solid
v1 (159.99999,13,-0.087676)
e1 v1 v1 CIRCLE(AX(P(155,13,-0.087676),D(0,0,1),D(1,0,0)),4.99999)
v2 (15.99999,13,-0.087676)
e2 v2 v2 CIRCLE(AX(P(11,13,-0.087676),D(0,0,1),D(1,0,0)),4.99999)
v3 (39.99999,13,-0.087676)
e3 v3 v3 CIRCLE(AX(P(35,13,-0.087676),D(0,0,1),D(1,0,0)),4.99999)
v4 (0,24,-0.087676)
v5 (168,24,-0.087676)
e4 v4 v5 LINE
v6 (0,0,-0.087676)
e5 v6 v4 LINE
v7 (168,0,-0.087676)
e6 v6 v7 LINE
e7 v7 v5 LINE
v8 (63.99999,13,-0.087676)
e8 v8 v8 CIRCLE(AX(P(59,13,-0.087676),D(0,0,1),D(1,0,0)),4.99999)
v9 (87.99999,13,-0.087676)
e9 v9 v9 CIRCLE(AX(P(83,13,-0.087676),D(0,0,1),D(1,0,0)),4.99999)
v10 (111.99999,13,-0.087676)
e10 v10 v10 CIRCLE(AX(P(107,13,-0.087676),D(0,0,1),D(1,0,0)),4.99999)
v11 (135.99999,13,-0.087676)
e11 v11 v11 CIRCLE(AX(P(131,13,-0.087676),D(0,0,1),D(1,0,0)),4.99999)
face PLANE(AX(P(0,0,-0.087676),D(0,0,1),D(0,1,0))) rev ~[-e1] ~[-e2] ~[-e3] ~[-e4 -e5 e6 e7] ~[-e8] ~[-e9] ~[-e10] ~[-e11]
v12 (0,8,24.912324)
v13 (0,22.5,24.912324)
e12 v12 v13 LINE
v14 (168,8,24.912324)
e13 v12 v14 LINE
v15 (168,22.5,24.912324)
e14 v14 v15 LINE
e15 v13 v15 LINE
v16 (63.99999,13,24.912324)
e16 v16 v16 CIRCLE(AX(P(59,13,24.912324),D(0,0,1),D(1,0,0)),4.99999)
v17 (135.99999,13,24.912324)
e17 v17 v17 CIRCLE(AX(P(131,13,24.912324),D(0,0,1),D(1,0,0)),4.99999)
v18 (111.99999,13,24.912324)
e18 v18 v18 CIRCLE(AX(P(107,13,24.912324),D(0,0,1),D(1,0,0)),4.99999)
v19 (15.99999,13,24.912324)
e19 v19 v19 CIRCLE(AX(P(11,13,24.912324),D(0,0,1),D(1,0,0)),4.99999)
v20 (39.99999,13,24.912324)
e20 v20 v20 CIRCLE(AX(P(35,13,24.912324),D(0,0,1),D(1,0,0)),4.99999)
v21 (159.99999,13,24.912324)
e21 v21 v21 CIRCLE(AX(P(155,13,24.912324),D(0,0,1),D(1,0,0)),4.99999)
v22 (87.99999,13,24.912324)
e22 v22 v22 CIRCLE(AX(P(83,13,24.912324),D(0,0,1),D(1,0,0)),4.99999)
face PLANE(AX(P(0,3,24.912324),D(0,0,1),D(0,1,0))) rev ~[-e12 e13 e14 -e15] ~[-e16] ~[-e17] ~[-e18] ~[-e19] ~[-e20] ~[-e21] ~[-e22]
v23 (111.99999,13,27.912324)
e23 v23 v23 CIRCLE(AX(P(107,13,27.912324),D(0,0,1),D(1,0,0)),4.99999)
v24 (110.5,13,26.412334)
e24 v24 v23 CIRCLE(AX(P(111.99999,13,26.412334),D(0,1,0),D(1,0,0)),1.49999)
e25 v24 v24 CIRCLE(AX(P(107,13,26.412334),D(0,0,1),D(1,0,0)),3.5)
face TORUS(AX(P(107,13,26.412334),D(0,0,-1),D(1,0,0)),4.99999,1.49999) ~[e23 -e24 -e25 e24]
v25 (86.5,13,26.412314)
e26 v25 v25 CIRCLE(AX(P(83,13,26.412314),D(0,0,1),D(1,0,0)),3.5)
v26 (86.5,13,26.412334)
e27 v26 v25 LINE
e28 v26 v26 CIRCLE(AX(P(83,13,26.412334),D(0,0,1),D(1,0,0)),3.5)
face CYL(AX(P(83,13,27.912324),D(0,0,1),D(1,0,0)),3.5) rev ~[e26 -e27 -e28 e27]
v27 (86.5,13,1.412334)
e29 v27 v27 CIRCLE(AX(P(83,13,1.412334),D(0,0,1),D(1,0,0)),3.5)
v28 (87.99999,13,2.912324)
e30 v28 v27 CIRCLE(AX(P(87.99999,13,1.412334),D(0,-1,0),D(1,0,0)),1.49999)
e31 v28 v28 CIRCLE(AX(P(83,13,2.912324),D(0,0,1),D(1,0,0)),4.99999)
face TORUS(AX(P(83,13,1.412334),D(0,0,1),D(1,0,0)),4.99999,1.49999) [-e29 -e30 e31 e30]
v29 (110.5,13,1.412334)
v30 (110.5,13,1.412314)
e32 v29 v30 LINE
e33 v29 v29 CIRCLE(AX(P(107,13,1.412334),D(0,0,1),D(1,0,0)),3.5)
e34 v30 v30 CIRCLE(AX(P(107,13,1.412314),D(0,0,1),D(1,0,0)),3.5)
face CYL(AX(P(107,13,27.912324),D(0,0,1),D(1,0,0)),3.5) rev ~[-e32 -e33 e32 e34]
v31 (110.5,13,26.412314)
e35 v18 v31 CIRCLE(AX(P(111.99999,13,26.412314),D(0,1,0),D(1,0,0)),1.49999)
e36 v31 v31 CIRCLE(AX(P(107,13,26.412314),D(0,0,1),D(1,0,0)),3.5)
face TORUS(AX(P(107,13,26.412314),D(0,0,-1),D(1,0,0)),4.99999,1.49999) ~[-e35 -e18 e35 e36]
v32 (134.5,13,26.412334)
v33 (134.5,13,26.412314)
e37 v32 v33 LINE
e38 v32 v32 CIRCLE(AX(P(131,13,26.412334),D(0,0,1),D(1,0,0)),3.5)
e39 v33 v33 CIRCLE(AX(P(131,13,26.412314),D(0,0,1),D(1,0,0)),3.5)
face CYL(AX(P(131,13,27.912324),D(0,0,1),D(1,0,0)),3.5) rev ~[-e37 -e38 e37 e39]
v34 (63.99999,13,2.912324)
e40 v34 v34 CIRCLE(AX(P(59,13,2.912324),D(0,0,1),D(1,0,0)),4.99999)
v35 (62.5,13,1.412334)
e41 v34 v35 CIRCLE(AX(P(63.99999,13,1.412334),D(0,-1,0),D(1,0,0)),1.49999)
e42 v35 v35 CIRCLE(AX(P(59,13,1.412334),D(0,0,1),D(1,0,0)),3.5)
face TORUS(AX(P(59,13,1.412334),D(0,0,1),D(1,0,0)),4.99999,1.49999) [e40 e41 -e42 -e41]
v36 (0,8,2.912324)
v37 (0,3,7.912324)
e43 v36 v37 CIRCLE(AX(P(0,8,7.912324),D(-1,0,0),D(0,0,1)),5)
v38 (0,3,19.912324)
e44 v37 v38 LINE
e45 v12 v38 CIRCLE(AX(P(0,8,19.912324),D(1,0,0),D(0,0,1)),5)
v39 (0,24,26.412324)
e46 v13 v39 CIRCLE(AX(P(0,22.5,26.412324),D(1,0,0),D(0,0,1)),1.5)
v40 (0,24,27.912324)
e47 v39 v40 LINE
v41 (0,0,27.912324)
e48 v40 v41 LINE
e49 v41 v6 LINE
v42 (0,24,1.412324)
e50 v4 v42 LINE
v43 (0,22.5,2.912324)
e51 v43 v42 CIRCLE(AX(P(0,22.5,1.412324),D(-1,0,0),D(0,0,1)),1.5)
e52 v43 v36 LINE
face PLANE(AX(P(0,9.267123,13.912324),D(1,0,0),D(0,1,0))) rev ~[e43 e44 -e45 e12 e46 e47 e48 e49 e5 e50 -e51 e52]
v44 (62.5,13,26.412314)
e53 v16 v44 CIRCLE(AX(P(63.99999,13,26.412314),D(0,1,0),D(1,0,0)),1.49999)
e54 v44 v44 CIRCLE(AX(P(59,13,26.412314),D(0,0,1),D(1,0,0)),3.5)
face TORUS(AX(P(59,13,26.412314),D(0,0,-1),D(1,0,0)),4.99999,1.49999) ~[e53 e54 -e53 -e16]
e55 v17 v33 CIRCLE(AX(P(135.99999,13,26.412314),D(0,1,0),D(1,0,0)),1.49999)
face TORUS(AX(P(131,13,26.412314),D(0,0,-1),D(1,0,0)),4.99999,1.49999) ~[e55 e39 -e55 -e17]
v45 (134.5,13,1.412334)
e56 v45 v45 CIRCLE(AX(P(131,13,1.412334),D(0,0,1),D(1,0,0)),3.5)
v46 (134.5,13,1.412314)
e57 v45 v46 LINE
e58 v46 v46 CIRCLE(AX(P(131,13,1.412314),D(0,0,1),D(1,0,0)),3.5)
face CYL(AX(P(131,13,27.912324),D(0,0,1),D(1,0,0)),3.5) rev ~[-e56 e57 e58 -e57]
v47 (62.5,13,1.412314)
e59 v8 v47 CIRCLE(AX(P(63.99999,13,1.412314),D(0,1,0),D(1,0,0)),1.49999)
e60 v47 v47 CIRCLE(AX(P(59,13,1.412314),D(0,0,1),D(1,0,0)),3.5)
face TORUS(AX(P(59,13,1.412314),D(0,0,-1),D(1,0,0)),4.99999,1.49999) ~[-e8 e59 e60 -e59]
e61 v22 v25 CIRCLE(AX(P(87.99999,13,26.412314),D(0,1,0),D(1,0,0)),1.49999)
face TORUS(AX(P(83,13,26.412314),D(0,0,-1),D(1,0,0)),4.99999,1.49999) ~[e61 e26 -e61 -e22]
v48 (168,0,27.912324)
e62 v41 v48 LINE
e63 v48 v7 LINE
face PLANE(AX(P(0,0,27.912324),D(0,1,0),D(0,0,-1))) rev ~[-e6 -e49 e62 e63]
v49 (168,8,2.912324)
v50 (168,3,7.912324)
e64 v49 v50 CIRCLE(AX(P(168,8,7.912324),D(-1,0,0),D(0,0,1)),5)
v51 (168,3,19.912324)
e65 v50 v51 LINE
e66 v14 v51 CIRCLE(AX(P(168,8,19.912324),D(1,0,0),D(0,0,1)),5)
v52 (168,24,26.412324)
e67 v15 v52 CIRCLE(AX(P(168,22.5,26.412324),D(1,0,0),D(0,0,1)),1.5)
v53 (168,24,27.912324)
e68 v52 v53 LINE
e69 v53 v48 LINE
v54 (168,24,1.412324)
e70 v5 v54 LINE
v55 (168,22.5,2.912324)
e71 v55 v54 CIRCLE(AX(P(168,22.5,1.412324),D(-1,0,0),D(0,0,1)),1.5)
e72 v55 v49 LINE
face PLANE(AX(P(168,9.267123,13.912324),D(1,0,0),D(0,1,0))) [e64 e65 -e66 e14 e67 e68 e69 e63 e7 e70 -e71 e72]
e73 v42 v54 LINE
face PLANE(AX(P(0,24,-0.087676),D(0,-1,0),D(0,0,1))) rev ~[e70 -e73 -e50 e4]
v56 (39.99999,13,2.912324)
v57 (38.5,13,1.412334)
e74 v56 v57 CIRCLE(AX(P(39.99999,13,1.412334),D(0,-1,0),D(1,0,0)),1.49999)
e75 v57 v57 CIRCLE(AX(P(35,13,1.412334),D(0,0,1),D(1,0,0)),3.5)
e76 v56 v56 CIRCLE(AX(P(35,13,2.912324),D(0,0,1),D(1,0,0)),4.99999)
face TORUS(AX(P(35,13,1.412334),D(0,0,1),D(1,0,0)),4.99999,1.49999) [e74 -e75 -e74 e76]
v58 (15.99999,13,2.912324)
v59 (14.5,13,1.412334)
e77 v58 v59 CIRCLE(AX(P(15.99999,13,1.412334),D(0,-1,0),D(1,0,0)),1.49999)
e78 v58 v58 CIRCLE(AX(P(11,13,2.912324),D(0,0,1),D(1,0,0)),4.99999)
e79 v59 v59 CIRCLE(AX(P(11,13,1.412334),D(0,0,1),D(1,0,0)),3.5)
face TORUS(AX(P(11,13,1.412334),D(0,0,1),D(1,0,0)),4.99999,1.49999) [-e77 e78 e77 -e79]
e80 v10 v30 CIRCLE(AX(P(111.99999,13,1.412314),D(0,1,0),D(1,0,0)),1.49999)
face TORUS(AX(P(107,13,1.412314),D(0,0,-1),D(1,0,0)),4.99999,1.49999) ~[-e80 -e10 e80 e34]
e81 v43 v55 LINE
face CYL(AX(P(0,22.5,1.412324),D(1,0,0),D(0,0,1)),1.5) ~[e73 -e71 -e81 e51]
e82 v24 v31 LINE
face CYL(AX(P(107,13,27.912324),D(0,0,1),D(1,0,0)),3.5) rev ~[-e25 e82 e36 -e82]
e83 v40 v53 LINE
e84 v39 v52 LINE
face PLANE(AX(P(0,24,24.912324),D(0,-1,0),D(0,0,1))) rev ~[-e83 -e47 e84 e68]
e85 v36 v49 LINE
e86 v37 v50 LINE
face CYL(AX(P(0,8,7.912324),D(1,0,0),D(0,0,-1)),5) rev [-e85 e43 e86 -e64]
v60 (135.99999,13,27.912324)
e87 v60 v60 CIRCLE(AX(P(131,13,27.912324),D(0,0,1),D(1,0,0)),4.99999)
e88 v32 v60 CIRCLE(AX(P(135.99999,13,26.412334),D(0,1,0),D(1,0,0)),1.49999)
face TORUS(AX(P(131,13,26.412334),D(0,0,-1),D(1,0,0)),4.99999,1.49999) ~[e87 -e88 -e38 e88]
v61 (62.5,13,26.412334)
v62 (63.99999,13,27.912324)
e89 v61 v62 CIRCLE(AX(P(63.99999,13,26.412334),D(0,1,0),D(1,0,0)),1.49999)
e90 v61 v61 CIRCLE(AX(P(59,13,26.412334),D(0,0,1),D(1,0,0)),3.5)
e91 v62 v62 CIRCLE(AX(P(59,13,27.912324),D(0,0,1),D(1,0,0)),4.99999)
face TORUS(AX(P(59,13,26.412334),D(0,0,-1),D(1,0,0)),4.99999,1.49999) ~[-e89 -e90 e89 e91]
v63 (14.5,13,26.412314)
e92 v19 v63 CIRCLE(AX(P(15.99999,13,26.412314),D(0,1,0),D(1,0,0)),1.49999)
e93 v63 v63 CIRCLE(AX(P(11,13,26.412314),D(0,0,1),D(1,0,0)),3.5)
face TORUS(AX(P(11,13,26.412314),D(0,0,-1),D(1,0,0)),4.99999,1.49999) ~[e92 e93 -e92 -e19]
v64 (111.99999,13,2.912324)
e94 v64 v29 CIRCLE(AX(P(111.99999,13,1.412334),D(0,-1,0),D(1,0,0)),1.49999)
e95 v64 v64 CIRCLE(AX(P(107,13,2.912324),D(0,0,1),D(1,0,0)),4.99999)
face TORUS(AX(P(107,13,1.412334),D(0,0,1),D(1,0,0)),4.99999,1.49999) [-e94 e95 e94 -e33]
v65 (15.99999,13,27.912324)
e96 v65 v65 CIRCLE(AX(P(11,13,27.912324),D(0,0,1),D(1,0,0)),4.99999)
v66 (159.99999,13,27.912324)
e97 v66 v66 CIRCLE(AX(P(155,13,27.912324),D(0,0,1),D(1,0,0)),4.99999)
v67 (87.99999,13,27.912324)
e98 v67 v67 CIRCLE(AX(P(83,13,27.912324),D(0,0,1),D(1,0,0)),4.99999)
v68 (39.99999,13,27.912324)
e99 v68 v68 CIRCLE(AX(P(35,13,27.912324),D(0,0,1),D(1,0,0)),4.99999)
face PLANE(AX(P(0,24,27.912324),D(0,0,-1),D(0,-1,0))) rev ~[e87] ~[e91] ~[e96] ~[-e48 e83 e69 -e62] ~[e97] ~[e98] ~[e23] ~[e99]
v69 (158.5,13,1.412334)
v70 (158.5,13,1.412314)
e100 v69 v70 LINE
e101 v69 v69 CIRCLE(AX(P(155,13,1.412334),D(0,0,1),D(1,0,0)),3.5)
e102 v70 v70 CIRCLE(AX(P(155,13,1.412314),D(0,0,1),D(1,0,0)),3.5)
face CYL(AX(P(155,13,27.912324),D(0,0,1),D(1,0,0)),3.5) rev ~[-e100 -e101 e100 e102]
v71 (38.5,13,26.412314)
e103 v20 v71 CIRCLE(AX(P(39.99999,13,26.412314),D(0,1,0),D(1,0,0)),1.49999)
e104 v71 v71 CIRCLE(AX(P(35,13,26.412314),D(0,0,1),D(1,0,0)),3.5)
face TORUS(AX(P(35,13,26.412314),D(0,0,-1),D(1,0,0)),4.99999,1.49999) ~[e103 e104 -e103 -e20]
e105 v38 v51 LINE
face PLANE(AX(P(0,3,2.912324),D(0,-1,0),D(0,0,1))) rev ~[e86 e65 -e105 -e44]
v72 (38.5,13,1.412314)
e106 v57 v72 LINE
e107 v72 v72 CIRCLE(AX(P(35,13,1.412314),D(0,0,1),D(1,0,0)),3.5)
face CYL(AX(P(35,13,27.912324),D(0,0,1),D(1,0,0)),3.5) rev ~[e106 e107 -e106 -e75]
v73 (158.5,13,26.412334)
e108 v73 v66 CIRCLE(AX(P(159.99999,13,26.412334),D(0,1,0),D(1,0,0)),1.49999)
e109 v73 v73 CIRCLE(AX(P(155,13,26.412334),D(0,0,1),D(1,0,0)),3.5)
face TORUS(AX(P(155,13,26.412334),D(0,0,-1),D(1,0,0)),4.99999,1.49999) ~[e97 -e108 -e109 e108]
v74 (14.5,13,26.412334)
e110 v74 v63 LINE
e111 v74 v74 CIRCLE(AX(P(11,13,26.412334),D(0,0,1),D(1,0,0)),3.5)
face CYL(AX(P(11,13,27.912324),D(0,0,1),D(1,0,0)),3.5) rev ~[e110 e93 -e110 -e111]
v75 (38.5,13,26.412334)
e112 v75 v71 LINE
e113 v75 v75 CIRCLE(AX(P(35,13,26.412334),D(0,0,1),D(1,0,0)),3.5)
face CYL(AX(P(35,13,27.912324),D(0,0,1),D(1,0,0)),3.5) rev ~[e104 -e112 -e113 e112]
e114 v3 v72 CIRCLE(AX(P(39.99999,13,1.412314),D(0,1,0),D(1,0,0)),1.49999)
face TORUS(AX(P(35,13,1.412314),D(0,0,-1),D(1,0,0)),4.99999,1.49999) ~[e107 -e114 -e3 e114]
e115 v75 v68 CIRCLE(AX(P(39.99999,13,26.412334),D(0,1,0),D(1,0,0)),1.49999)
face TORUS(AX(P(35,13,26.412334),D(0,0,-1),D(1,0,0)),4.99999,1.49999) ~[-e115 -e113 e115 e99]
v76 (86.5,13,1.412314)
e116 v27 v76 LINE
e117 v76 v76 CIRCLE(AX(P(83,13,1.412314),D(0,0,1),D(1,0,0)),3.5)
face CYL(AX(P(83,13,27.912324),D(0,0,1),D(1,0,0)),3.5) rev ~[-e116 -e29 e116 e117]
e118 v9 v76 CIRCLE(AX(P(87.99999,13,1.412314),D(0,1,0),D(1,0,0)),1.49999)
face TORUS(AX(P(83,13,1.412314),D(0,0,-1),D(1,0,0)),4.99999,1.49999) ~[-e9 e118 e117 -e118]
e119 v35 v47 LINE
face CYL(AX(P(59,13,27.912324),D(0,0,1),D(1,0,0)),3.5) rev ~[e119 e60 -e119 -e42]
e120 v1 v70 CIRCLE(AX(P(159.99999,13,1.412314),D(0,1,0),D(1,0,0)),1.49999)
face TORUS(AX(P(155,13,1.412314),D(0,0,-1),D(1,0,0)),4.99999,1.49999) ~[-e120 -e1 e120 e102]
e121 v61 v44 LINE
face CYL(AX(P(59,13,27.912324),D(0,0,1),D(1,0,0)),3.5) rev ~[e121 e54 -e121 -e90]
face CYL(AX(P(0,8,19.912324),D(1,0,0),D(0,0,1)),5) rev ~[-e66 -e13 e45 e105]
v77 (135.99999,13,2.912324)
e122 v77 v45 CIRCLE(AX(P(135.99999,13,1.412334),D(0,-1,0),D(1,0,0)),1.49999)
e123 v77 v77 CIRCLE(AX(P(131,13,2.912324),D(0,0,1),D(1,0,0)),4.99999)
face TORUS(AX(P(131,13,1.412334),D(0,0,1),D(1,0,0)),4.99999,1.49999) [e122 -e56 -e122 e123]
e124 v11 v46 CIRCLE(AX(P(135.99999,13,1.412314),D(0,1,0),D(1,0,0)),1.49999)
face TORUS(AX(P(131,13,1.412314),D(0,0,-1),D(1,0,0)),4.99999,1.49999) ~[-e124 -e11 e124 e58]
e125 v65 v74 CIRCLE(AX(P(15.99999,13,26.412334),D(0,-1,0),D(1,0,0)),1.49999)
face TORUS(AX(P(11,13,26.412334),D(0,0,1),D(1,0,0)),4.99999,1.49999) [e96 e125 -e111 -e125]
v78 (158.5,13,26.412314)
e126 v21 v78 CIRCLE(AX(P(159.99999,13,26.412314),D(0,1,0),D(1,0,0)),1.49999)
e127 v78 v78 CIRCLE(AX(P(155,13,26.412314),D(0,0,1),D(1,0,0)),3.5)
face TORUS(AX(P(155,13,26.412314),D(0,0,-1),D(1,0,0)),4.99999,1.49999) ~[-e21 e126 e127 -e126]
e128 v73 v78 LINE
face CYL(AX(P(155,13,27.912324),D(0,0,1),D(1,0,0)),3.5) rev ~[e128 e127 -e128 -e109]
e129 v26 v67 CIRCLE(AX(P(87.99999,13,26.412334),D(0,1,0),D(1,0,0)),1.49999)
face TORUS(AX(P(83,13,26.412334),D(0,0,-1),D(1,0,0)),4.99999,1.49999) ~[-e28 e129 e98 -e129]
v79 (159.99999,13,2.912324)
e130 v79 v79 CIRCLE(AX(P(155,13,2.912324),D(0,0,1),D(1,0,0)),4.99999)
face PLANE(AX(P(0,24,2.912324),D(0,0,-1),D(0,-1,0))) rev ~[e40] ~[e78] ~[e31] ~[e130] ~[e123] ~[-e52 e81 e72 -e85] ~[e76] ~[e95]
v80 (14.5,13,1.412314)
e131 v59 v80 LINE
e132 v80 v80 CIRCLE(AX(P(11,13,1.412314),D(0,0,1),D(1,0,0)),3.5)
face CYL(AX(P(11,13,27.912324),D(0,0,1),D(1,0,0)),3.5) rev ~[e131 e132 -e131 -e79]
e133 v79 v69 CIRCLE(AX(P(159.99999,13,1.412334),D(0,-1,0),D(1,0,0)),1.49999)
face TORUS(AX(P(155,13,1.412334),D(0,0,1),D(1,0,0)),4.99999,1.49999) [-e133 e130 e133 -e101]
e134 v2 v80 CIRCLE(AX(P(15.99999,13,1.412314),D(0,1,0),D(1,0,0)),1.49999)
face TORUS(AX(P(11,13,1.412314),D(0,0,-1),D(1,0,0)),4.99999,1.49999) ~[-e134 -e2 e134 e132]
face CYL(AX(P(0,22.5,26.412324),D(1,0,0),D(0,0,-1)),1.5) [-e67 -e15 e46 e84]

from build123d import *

# Parameters (mm, degrees)
F1_DEPTH = 168
F2_R     = 3.5
F3_DEPTH = 33
F4_R     = 5
F5_R     = 1.5
F6_R     = 1.49999
F7_R     = 1.49999
F8_R     = 1.49999


# Not quite as in the source:
# - a fillet or chamfer is up to 0.001 mm smaller than in the source, because OpenCascade refuses the exact size


with BuildPart() as f1:
    # F0 (on Right) → F1 (new body)
    with BuildSketch(Plane.YZ):
        Polygon((24, 27.9123237882), (0, 27.9123237882), (0, 0), (0, -0.0876762118), (24, -0.0876762118), (24, 2.9123237882), (3, 2.9123237882), (3, 24.9123237882), (24, 24.9123237882), align=None)
    extrude(amount=F1_DEPTH)

    # F2 (on face) → F3 (cut)
    with BuildSketch(Plane.XY.offset(27.9123237882)):
        with Locations((11, 13)):
            Circle(F2_R)
        with Locations((35, 13)):
            Circle(F2_R)
        with Locations((59, 13)):
            Circle(F2_R)
        with Locations((83, 13)):
            Circle(F2_R)
        with Locations((107, 13)):
            Circle(F2_R)
        with Locations((131, 13)):
            Circle(F2_R)
        with Locations((155, 13)):
            Circle(F2_R)
    extrude(amount=-F3_DEPTH, mode=Mode.SUBTRACT)

    # F4
    f4_edges = [f1.edges().sort_by_distance(p)[0] for p in [
        (84, 3, 24.912324),
        (84, 3, 2.912324),
    ]]
    fillet(f4_edges, radius=F4_R)

    # F5
    f5_edges = [f1.edges().sort_by_distance(p)[0] for p in [
        (84, 24, 24.912324),
        (84, 24, 2.912324),
    ]]
    fillet(f5_edges, radius=F5_R)

    # F6 (radius 1.5 in the source; OpenCascade refuses exactly that, so slightly less here)
    f6_edges = [f1.edges().sort_by_distance(p)[0] for p in [
        (7.5, 13, 27.912324),
        (7.5, 13, 24.912324),
    ]]
    fillet(f6_edges, radius=F6_R)

    # F7 (radius 1.5 in the source; OpenCascade refuses exactly that, so slightly less here)
    f7_edges = [f1.edges().sort_by_distance(p)[0] for p in [
        (31.5, 13, 24.912324),
        (31.5, 13, 27.912324),
        (55.5, 13, 24.912324),
        (55.5, 13, 27.912324),
        (79.5, 13, 24.912324),
        (79.5, 13, 27.912324),
        (103.5, 13, 24.912324),
        (103.5, 13, 27.912324),
        (127.5, 13, 24.912324),
        (127.5, 13, 27.912324),
        (151.5, 13, 24.912324),
        (151.5, 13, 27.912324),
    ]]
    fillet(f7_edges, radius=F7_R)

    # F8 (radius 1.5 in the source; OpenCascade refuses exactly that, so slightly less here)
    f8_edges = [f1.edges().sort_by_distance(p)[0] for p in [
        (7.5, 13, -0.087676),
        (7.5, 13, 2.912324),
        (31.5, 13, -0.087676),
        (31.5, 13, 2.912324),
        (55.5, 13, -0.087676),
        (55.5, 13, 2.912324),
        (79.5, 13, -0.087676),
        (79.5, 13, 2.912324),
        (103.5, 13, -0.087676),
        (103.5, 13, 2.912324),
        (127.5, 13, -0.087676),
        (127.5, 13, 2.912324),
        (151.5, 13, -0.087676),
        (151.5, 13, 2.912324),
    ]]
    fillet(f8_edges, radius=F8_R)


solid = f1.part
